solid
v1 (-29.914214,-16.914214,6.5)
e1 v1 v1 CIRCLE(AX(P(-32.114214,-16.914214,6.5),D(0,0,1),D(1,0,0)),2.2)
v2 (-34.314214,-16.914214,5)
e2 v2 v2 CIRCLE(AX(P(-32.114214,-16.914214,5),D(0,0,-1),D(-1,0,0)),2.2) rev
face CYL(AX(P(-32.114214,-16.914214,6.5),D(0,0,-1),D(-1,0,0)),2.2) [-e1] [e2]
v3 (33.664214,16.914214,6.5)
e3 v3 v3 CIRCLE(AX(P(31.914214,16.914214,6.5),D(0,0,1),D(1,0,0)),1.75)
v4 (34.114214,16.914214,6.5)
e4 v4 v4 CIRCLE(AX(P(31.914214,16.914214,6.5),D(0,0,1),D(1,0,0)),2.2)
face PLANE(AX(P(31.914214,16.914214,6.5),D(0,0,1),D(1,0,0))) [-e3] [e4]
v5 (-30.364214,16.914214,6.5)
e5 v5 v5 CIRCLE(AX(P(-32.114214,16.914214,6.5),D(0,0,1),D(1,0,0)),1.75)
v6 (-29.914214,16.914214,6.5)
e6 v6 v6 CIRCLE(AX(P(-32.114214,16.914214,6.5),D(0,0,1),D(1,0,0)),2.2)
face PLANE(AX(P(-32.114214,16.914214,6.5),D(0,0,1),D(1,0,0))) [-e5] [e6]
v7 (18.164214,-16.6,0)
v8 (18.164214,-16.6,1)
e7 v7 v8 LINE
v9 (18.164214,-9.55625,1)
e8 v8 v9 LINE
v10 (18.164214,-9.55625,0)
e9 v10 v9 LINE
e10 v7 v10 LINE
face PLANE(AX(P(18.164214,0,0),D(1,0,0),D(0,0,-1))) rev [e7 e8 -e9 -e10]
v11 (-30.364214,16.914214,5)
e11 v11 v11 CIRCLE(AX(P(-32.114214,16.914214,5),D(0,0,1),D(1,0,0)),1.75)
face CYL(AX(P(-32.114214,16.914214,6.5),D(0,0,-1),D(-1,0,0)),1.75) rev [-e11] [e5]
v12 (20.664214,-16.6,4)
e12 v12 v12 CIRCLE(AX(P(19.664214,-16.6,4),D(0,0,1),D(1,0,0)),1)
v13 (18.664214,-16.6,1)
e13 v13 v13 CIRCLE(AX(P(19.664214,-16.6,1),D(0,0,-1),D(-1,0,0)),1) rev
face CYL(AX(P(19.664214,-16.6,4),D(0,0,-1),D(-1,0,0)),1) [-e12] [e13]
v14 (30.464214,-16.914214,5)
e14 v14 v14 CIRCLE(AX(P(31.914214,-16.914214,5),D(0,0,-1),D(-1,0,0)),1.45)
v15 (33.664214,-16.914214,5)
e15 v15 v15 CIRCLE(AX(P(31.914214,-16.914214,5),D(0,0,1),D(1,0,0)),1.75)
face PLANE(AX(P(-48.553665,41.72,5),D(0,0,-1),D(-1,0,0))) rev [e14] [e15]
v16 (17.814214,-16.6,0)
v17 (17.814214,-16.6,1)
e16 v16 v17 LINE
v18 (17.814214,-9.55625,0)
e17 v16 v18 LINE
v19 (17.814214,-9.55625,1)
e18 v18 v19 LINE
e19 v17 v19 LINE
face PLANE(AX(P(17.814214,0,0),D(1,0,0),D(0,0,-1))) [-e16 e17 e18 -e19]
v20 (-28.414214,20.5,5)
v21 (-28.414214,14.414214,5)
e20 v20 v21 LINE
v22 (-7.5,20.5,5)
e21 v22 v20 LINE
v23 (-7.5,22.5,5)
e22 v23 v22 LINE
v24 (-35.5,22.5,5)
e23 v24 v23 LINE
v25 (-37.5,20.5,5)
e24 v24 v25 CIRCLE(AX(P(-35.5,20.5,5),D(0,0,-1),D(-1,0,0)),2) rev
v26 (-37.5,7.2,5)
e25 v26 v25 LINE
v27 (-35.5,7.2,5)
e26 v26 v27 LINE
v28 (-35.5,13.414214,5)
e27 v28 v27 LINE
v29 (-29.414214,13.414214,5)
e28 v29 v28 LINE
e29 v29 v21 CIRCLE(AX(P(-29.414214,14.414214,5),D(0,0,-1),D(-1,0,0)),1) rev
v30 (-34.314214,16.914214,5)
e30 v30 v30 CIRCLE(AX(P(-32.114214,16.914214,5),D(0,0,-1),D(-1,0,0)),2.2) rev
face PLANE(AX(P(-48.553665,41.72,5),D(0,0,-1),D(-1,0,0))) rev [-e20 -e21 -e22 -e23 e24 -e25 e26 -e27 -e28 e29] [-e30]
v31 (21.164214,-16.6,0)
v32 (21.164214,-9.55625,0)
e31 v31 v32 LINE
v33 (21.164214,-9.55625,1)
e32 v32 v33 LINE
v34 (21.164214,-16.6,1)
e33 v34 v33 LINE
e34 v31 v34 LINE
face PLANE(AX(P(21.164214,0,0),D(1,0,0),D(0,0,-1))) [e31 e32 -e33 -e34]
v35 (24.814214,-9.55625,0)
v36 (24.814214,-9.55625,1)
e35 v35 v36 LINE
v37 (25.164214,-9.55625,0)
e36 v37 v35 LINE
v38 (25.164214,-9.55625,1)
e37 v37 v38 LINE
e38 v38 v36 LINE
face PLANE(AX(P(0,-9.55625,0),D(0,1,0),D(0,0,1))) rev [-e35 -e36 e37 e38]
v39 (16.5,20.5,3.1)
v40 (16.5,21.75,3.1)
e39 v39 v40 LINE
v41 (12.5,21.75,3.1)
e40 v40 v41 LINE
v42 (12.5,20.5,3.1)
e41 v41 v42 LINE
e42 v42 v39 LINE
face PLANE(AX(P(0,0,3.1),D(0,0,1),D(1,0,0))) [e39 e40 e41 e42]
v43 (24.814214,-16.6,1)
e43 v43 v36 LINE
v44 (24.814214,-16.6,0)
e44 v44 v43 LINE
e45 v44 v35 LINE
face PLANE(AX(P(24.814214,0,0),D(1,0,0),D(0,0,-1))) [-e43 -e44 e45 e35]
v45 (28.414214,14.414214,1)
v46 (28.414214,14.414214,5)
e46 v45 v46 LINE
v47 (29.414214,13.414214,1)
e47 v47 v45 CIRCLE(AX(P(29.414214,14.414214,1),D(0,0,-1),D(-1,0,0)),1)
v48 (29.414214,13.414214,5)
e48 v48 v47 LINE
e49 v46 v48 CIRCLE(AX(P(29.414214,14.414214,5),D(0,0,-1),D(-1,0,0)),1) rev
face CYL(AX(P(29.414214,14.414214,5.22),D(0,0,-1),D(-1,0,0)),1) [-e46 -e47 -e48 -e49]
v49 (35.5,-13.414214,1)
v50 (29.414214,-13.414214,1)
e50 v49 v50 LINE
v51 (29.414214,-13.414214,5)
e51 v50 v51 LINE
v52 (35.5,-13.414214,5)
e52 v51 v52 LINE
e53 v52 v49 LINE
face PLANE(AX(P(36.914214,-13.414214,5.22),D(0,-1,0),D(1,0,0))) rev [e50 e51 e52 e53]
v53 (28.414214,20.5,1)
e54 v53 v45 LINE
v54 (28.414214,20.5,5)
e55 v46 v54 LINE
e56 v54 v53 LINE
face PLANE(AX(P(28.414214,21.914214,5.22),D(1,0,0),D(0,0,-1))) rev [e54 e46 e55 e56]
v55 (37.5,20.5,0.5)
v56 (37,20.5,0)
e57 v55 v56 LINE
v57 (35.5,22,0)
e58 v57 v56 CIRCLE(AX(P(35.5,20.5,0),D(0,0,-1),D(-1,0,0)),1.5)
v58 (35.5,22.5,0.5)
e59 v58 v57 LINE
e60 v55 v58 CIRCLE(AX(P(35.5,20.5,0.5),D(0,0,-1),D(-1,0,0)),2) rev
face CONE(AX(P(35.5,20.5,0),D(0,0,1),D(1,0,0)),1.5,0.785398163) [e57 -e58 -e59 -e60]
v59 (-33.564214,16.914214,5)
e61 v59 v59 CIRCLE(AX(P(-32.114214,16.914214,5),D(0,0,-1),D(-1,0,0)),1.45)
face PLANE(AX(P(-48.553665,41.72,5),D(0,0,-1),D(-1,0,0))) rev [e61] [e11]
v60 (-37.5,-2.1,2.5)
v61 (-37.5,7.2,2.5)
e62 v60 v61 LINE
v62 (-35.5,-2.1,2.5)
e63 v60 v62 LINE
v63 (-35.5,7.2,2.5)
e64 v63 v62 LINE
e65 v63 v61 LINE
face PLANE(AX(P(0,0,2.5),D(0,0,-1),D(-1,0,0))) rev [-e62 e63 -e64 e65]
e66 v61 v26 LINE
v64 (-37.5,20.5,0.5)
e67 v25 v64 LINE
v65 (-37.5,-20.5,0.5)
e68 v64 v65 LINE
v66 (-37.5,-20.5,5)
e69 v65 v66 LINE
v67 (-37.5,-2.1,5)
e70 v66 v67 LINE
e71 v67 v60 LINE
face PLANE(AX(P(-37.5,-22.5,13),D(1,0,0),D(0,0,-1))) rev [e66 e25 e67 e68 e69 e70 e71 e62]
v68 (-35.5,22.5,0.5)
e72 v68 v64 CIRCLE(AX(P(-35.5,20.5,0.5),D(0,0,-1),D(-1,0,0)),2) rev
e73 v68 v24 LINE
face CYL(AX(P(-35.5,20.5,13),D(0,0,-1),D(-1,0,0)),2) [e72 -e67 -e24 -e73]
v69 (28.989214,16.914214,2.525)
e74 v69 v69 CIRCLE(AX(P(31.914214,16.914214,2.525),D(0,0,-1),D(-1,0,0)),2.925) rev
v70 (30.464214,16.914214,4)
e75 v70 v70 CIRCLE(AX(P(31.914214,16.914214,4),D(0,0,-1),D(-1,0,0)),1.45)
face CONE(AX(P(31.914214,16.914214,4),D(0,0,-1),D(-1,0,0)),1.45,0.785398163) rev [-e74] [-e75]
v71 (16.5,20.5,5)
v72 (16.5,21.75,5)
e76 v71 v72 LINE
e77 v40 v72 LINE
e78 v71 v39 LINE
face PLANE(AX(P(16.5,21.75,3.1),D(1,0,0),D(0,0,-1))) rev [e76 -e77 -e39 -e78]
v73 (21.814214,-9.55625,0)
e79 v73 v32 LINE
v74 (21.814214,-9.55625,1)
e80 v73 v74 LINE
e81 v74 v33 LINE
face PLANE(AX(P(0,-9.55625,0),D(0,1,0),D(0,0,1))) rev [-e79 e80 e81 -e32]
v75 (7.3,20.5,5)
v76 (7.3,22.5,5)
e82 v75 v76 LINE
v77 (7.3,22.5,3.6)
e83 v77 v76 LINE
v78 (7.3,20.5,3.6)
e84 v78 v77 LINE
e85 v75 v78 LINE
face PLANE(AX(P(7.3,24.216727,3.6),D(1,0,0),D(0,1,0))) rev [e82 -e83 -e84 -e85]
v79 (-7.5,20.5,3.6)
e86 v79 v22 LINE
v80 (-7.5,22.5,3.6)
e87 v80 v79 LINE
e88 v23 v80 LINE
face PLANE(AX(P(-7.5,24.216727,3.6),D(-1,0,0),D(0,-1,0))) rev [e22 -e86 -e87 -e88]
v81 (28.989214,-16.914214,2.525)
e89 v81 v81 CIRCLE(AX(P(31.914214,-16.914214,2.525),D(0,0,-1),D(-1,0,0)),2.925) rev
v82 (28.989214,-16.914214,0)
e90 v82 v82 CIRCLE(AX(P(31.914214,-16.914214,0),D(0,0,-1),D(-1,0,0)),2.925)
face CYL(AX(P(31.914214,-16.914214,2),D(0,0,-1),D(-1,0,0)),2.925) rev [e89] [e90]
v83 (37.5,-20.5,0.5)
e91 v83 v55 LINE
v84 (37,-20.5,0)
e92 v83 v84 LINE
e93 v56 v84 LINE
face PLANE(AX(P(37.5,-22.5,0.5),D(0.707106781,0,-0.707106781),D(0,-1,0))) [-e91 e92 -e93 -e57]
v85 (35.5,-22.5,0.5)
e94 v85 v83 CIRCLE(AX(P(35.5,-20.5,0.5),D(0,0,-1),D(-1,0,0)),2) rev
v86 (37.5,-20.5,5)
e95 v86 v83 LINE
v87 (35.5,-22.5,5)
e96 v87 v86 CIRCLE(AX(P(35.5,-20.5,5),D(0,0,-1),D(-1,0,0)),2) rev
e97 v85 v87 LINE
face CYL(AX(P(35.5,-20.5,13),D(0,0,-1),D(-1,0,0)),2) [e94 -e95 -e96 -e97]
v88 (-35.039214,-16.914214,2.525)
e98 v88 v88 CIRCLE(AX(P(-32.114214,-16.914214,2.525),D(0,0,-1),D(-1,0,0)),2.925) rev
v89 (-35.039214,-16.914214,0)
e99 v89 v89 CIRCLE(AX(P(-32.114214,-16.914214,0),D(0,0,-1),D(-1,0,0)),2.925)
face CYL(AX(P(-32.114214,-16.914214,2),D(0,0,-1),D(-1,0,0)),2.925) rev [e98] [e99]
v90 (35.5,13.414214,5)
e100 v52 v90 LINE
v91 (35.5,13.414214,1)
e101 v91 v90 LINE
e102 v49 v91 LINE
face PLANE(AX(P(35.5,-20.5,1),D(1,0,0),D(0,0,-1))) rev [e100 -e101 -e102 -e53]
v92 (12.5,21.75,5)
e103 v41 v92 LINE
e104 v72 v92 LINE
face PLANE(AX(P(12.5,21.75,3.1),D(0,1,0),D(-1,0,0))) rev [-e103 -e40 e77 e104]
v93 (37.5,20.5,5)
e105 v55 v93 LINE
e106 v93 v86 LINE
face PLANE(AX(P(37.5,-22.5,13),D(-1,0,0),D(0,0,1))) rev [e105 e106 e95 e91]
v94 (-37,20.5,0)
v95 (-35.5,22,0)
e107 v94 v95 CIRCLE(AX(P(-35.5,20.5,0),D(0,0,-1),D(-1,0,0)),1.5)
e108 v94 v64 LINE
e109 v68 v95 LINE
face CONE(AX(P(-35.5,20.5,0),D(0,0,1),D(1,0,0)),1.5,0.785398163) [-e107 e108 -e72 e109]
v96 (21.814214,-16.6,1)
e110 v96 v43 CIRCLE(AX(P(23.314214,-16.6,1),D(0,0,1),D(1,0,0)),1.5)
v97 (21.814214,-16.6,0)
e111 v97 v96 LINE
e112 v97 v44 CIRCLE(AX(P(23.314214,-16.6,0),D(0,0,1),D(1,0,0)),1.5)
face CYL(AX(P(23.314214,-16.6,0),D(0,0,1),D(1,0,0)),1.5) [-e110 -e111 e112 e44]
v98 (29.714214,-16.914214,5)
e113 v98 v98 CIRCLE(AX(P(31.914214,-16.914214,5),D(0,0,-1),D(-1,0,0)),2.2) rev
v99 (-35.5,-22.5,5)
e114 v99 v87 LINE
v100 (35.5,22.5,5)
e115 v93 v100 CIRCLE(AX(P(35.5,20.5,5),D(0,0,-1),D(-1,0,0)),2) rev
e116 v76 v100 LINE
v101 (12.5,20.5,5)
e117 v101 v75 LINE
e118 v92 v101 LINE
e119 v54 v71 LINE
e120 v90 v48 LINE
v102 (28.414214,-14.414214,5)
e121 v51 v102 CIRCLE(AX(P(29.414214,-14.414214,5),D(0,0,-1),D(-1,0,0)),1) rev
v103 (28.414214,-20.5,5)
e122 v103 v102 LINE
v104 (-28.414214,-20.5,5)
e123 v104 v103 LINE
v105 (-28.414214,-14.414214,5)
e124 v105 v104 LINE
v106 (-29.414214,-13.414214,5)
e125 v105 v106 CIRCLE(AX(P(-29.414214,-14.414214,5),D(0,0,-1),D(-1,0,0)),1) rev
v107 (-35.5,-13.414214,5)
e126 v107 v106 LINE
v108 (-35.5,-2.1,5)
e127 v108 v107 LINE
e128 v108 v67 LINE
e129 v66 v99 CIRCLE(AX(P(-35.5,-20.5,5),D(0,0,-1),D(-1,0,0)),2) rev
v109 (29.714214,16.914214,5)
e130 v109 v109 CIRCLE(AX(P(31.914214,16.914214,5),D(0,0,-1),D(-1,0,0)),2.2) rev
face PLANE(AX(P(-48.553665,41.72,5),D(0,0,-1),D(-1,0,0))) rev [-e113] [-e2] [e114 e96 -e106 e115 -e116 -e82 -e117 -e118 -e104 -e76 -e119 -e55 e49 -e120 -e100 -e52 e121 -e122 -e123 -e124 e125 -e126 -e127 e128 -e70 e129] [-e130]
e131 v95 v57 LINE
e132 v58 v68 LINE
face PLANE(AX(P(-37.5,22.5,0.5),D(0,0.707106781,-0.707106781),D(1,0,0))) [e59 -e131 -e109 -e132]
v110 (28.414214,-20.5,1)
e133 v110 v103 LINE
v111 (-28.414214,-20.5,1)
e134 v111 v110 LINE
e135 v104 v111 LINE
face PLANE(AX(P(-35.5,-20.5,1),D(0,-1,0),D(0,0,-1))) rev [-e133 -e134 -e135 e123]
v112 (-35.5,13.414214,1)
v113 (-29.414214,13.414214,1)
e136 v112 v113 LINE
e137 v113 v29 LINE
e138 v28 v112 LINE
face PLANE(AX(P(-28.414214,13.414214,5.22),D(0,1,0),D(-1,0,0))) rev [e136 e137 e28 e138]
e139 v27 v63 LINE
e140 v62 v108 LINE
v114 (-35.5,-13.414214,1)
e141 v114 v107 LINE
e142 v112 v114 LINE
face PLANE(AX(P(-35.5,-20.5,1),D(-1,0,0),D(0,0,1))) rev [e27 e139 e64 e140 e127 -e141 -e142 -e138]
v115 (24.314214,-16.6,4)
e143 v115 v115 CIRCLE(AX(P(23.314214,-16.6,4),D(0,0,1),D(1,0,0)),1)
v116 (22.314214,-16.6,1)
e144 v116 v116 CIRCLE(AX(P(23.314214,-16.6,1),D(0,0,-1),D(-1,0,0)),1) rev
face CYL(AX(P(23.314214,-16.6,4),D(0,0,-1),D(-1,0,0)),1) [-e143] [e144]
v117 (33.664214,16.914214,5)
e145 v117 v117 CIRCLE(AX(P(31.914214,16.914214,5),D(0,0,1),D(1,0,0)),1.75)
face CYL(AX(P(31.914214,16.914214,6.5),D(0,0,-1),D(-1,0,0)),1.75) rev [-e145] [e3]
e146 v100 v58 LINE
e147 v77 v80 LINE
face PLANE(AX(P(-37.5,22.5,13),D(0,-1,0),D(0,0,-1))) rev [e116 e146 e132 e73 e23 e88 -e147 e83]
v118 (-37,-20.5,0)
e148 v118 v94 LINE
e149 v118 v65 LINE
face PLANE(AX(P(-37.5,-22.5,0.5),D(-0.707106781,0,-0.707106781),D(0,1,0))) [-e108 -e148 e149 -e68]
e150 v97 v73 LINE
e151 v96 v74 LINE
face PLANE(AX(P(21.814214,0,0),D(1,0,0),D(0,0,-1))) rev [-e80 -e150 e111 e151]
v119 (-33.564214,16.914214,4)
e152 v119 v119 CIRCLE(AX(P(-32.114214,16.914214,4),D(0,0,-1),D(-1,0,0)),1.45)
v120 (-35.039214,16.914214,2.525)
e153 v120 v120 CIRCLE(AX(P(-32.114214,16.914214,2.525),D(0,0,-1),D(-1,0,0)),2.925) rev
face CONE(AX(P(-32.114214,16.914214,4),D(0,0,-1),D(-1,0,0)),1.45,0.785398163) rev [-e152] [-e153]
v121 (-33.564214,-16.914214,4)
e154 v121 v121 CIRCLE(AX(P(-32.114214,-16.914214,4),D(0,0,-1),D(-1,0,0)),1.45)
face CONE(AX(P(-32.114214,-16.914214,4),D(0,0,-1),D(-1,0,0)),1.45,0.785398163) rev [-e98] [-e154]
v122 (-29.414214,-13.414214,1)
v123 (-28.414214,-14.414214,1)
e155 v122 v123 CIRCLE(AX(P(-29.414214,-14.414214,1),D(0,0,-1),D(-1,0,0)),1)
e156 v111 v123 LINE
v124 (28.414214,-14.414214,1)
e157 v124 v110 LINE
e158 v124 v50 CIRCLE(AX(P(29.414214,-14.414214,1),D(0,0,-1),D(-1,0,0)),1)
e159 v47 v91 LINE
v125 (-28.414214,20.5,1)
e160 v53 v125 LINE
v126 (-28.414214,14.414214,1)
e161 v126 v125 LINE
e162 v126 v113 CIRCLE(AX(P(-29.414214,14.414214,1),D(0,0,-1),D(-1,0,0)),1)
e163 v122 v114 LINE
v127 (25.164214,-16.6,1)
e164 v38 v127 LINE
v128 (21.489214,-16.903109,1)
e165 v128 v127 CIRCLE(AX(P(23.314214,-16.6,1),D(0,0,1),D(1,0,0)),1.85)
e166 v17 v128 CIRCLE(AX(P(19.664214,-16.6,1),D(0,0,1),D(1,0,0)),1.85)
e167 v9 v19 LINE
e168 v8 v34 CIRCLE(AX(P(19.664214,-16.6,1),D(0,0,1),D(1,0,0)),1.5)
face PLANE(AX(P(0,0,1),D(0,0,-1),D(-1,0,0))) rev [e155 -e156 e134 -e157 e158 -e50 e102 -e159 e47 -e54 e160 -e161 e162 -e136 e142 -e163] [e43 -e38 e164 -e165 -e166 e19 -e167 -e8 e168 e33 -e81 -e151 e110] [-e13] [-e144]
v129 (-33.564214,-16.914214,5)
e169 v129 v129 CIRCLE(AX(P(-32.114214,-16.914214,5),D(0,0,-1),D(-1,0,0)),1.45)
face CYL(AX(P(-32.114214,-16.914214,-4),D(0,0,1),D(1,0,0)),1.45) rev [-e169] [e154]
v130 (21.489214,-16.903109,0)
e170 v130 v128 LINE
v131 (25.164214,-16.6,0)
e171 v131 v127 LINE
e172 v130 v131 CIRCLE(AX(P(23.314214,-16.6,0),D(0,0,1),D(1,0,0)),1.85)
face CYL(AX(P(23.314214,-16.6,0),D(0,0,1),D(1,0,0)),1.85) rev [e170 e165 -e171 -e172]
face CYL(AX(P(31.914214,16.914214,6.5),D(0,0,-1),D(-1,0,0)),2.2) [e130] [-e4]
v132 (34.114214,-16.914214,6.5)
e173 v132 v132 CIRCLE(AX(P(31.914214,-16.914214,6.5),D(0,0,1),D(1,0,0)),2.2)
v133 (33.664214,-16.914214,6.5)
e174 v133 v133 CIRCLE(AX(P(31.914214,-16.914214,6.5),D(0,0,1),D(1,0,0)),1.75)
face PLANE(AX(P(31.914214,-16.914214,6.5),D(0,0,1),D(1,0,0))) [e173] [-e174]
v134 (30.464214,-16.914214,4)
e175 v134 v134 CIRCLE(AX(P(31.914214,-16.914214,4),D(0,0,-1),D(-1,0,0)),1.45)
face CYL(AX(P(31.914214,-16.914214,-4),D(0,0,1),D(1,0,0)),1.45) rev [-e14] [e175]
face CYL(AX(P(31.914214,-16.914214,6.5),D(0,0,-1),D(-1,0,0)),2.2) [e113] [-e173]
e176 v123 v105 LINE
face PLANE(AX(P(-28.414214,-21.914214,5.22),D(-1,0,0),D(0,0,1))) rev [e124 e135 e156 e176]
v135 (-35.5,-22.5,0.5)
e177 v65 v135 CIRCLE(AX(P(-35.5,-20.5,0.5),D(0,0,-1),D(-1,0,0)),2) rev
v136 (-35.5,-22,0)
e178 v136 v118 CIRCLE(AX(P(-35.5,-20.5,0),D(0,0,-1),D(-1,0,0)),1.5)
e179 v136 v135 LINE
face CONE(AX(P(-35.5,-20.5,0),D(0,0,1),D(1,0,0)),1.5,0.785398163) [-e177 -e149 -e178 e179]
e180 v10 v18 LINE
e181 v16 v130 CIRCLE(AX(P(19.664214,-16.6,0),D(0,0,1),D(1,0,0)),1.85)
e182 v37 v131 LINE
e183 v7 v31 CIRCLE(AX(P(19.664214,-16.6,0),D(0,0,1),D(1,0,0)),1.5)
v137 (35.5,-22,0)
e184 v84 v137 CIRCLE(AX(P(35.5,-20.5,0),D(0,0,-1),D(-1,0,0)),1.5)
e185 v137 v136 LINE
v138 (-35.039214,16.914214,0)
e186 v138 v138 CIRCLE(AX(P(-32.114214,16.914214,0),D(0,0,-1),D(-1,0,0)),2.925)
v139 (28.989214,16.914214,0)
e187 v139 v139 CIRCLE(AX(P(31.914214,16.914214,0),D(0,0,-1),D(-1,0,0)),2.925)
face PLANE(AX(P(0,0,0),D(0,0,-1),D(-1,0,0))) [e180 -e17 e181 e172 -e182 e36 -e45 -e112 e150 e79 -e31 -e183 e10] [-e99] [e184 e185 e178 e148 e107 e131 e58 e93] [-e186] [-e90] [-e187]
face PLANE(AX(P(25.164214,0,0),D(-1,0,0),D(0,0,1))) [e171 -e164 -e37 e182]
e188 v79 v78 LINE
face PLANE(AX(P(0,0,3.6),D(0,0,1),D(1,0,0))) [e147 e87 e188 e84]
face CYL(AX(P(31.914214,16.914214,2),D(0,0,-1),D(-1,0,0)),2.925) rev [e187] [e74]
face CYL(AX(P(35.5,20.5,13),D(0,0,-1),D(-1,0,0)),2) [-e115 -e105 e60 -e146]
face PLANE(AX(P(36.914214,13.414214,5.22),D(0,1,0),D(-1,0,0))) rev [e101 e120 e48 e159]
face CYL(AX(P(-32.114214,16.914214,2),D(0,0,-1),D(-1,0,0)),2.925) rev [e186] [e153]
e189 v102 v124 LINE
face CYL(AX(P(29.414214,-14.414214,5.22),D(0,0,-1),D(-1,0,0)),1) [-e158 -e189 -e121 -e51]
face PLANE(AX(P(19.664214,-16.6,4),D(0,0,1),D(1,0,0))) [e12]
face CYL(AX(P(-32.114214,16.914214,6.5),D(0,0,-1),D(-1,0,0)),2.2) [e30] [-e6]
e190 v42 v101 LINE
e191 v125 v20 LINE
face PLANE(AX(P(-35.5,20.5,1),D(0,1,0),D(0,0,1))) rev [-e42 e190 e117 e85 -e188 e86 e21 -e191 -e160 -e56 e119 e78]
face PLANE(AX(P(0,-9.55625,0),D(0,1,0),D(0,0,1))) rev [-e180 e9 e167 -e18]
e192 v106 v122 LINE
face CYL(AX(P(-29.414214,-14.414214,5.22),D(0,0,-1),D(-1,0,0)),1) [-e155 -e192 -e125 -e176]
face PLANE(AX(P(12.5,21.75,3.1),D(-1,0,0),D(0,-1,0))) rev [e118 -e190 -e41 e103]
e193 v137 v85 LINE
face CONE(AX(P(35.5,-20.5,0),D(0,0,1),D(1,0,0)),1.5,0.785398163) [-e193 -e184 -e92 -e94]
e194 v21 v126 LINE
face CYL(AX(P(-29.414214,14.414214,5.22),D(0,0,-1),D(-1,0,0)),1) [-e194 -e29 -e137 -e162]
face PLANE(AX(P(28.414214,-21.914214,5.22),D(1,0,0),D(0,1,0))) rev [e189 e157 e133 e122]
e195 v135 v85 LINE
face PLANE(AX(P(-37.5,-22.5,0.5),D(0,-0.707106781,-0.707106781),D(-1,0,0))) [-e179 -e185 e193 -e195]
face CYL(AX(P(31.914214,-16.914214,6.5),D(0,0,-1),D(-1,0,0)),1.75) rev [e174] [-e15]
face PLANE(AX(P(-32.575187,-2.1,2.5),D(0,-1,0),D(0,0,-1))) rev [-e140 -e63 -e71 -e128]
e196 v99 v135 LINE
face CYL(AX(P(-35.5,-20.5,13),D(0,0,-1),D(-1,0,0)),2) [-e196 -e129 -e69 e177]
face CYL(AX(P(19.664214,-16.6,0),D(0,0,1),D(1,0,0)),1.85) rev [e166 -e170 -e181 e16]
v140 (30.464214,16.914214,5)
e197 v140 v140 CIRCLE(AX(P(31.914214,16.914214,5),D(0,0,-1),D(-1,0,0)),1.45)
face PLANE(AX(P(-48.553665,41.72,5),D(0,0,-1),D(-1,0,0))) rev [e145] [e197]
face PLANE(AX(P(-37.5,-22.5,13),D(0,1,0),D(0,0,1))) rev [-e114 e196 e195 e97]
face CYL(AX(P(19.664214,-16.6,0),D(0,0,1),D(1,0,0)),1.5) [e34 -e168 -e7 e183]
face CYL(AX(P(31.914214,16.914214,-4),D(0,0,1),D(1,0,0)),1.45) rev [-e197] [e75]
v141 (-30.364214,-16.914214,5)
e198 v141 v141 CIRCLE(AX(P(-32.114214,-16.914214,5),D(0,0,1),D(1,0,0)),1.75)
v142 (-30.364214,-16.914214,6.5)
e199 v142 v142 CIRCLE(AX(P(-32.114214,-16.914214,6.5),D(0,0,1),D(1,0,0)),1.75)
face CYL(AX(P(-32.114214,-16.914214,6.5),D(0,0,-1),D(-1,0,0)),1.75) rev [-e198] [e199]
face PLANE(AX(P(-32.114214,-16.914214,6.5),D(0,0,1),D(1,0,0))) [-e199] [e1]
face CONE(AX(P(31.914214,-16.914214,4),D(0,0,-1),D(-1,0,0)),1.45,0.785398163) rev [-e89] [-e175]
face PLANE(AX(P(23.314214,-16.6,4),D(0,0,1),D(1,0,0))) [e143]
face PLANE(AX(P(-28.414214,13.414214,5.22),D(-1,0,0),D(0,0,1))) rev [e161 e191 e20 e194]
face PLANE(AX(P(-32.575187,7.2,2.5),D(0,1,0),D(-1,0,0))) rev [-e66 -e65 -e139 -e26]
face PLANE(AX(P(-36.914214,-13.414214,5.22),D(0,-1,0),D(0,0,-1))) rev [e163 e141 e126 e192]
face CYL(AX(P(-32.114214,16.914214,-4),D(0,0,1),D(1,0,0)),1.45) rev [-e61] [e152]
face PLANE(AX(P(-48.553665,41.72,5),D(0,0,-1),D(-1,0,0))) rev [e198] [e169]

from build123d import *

# Parameters (mm, degrees)
SKICA1_W                  = 75
SKICA1_H                  = 45
P_IDAT_VYSUNUT_M1_DEPTH   = 13
SKICA2_W                  = 71
SKICA2_H                  = 41
ODEBRAT_VYSUNUT_M1_DEPTH  = 12
ZAOBLIT1_R                = 2
ZKOSEN_2_SIZE             = 0.5
SKICA4_W                  = 8.5
SKICA4_H                  = 8.5
P_IDAT_VYSUNUT_M2_DEPTH   = 4.22
ZAOBLIT2_R                = 1
SKICA6_W                  = 92.209043038
SKICA6_H                  = 16.914138174
ODEBRAT_VYSUNUT_M3_DEPTH  = 64.22
SKICA5_W                  = 10.08575576
SKICA5_H                  = 9.3
ODEBRAT_VYSUNUT_M4_DEPTH  = 10.5
SKICA7_W                  = 4
SKICA7_H                  = 7.545536299
ODEBRAT_VYSUNUT_M5_DEPTH  = 1.9
SKICA8_W                  = 14.8
SKICA8_H                  = 7.292326558
ODEBRAT_VYSUNUT_M6_DEPTH  = 1.4
SKICA9_R                  = 1.45
ODEBRAT_VYSUNUT_M7_DEPTH  = 5
SKICA10_R                 = 2.2
SKICA10_R_2               = 1.75
P_IDAT_VYSUNUT_M3_DEPTH   = 1.5
ODEBRAT_START             = -2
SKICA11_R                 = 2.925
SKICA11_R_2               = 1.45
ODEBRAT_VYSUNUT_M8_DEPTH  = 2
SKICA12_R                 = 1
P_IDAT_VYSUNUT_M4_DEPTH   = 3
ODEBRAT_VYSUNUT_M14_DEPTH = 1
ZKOSEN_3_SIZE             = 2
ZKOSEN_4_SIZE             = 2


with BuildPart() as part:
    # Skica1 → Přidat vysunutím1 (new body)
    with BuildSketch(Plane.XY):
        Rectangle(SKICA1_W, SKICA1_H)
    extrude(amount=P_IDAT_VYSUNUT_M1_DEPTH)

    # Skica2 → Odebrat vysunutím1 (cut)
    with BuildSketch(Plane.XY.offset(13)):
        Rectangle(SKICA2_W, SKICA2_H)
    extrude(amount=-ODEBRAT_VYSUNUT_M1_DEPTH, mode=Mode.SUBTRACT)

    # Zaoblit1
    zaoblit1_edges = [part.edges().sort_by_distance(p)[0] for p in [
        (35.5, 20.5, 7),
        (35.5, -20.5, 7),
        (-35.5, -20.5, 7),
        (-35.5, 20.5, 7),
        (37.5, -22.5, 6.5),
        (-37.5, -22.5, 6.5),
        (-37.5, 22.5, 6.5),
        (37.5, 22.5, 6.5),
    ]]
    fillet(zaoblit1_edges, radius=ZAOBLIT1_R)

    # Zkosení2
    zkosen_2_edges = [part.edges().sort_by_distance(p)[0] for p in [
        (0, 22.5, 0),
        (37.5, 0, 0),
        (0, -22.5, 0),
        (-37.5, 0, 0),
        (-36.914213562, 21.914213562, 0),
        (-36.914213562, -21.914213562, 0),
        (36.914213562, -21.914213562, 0),
        (36.914213562, 21.914213562, 0),
    ]]
    chamfer(zkosen_2_edges, length=ZKOSEN_2_SIZE)

    # Skica4 → Přidat vysunutím2 (add)
    with BuildSketch(Plane.XY.offset(1)):
        with Locations((-32.664213562, 17.664213562)):
            Rectangle(SKICA4_W, SKICA4_H)
        with Locations((-32.664213562, -17.664213562)):
            Rectangle(SKICA4_W, SKICA4_H)
        with Locations((32.664213562, -17.664213562)):
            Rectangle(SKICA4_W, SKICA4_H)
        with Locations((32.664213562, 17.664213562)):
            Rectangle(SKICA4_W, SKICA4_H)
    extrude(amount=P_IDAT_VYSUNUT_M2_DEPTH)

    # Zaoblit2
    zaoblit2_edges = [part.edges().sort_by_distance(p)[0] for p in [
        (-28.414213562, 13.414213562, 3.11),
        (-28.414213562, -13.414213562, 3.11),
        (28.414213562, -13.414213562, 3.11),
        (28.414213562, 13.414213562, 3.11),
    ]]
    fillet(zaoblit2_edges, radius=ZAOBLIT2_R)

    # Skica6 → Odebrat vysunutím3 (cut)
    with BuildSketch(Plane.XZ.offset(22.5)):
        with Locations((-2.449143373, 13.457069087)):
            Rectangle(SKICA6_W, SKICA6_H)
    extrude(amount=-ODEBRAT_VYSUNUT_M3_DEPTH, mode=Mode.SUBTRACT)

    # Skica5 → Odebrat vysunutím4 (cut)
    with BuildSketch(Plane.XY.offset(13)):
        with Locations((-37.618064514, 2.55)):
            Rectangle(SKICA5_W, SKICA5_H)
    extrude(amount=-ODEBRAT_VYSUNUT_M4_DEPTH, mode=Mode.SUBTRACT)

    # Skica7 → Odebrat vysunutím5 (cut)
    with BuildSketch(Plane.XY.offset(5)):
        with Locations((14.5, 17.977231851)):
            Rectangle(SKICA7_W, SKICA7_H)
    extrude(amount=-ODEBRAT_VYSUNUT_M5_DEPTH, mode=Mode.SUBTRACT)

    # Skica8 → Odebrat vysunutím6 (cut)
    with BuildSketch(Plane.XY.offset(5)):
        with Locations((-0.1, 20.570563513)):
            Rectangle(SKICA8_W, SKICA8_H)
    extrude(amount=-ODEBRAT_VYSUNUT_M6_DEPTH, mode=Mode.SUBTRACT)

    # Skica9 → Odebrat vysunutím7 (cut, symmetric)
    with BuildSketch(Plane.XY.offset(1)):
        with Locations(Location((-32.114213562, 16.914213562, 0), (0, 0, 180))):
            Circle(SKICA9_R)
        with Locations(Location((-32.114213562, -16.914213562, 0), (0, 0, 180))):
            Circle(SKICA9_R)
        with Locations(Location((31.914213562, -16.914213562, 0), (0, 0, 180))):
            Circle(SKICA9_R)
        with Locations(Location((31.914213562, 16.914213562, 0), (0, 0, 180))):
            Circle(SKICA9_R)
    extrude(amount=ODEBRAT_VYSUNUT_M7_DEPTH, both=True, mode=Mode.SUBTRACT)

    # Skica10 → Přidat vysunutím3 (add)
    # profile 1 of 4: a face of its own
    with BuildSketch(Plane.XY.offset(5)):
        with Locations(Location((31.914213562, 16.914213562, 0), (0, 0, 180))):
            Circle(SKICA10_R)
        with Locations((31.914213562, 16.914213562)):
            Circle(SKICA10_R_2, mode=Mode.SUBTRACT)
    # profile 2 of 4: a face of its own
    with BuildSketch(Plane.XY.offset(5)):
        with Locations(Location((31.914213562, -16.914213562, 0), (0, 0, 180))):
            Circle(SKICA10_R)
        with Locations((31.914213562, -16.914213562)):
            Circle(SKICA10_R_2, mode=Mode.SUBTRACT)
    # profile 3 of 4: a face of its own
    with BuildSketch(Plane.XY.offset(5)):
        with Locations(Location((-32.114213562, -16.914213562, 0), (0, 0, 180))):
            Circle(SKICA10_R)
        with Locations((-32.114213562, -16.914213562)):
            Circle(SKICA10_R_2, mode=Mode.SUBTRACT)
    # profile 4 of 4: a face of its own
    with BuildSketch(Plane.XY.offset(5)):
        with Locations(Location((-32.114213562, 16.914213562, 0), (0, 0, 180))):
            Circle(SKICA10_R)
        with Locations((-32.114213562, 16.914213562)):
            Circle(SKICA10_R_2, mode=Mode.SUBTRACT)
    extrude(amount=P_IDAT_VYSUNUT_M3_DEPTH)

    # Skica11 → Odebrat vysunutím8 (cut)
    # profile 1 of 4: a face of its own
    with BuildSketch(Plane(origin=(0, 0, 0), x_dir=(-1, 0, 0), z_dir=(0, 0, -1)).offset(ODEBRAT_START)):
        with Locations((32.114213562, -16.914213562)):
            Circle(SKICA11_R)
        with Locations((32.114213562, -16.914213562)):
            Circle(SKICA11_R_2, mode=Mode.SUBTRACT)
    # profile 2 of 4: a face of its own
    with BuildSketch(Plane(origin=(0, 0, 0), x_dir=(-1, 0, 0), z_dir=(0, 0, -1)).offset(ODEBRAT_START)):
        with Locations((-31.914213562, -16.914213562)):
            Circle(SKICA11_R)
        with Locations((-31.914213562, -16.914213562)):
            Circle(SKICA11_R_2, mode=Mode.SUBTRACT)
    # profile 3 of 4: a face of its own
    with BuildSketch(Plane(origin=(0, 0, 0), x_dir=(-1, 0, 0), z_dir=(0, 0, -1)).offset(ODEBRAT_START)):
        with Locations((-31.914213562, 16.914213562)):
            Circle(SKICA11_R)
        with Locations((-31.914213562, 16.914213562)):
            Circle(SKICA11_R_2, mode=Mode.SUBTRACT)
    # profile 4 of 4: a face of its own
    with BuildSketch(Plane(origin=(0, 0, 0), x_dir=(-1, 0, 0), z_dir=(0, 0, -1)).offset(ODEBRAT_START)):
        with Locations((32.114213562, 16.914213562)):
            Circle(SKICA11_R)
        with Locations((32.114213562, 16.914213562)):
            Circle(SKICA11_R_2, mode=Mode.SUBTRACT)
    extrude(amount=ODEBRAT_VYSUNUT_M8_DEPTH, mode=Mode.SUBTRACT)

    # Skica12 → Přidat vysunutím4 (add)
    with BuildSketch(Plane.XY.offset(1)):
        with Locations(Location((23.314213562, -16.6, 0), (0, 0, 180))):
            Circle(SKICA12_R)
        with Locations(Location((19.664213562, -16.6, 0), (0, 0, 180))):
            Circle(SKICA12_R)
    extrude(amount=P_IDAT_VYSUNUT_M4_DEPTH)

    # Skica13 → Odebrat vysunutím14 (cut)
    with BuildSketch(Plane.XY.offset(1)):
        with BuildLine():
            ThreePointArc((24.814213562, -16.6), (23.314213562, -18.1), (21.814213562, -16.6))
            Line((21.814213562, -16.6), (21.814213562, -9.556250206))
            Line((21.814213562, -9.556250206), (21.514213562, -9.556250206))
            Line((21.514213562, -9.556250206), (21.464213562, -9.556250206))
            Line((21.464213562, -9.556250206), (21.164213562, -9.556250206))
            Line((21.164213562, -9.556250206), (21.164213562, -16.6))
            ThreePointArc((21.164213562, -16.6), (19.664213562, -18.1), (18.164213562, -16.6))
            Line((18.164213562, -16.6), (18.164213562, -9.556250206))
            Line((18.164213562, -9.556250206), (17.814213562, -9.556250206))
            Line((17.814213562, -9.556250206), (17.814213562, -16.6))
            ThreePointArc((17.814213562, -16.6), (19.512144499, -18.443739407), (21.489213562, -16.903108891))
            ThreePointArc((21.489213562, -16.903108891), (23.466282626, -18.443739407), (25.164213562, -16.6))
            Line((25.164213562, -16.6), (25.164213562, -9.556250206))
            Line((25.164213562, -9.556250206), (24.814213562, -9.556250206))
            Line((24.814213562, -9.556250206), (24.814213562, -16.6))
        make_face()
    extrude(amount=-ODEBRAT_VYSUNUT_M14_DEPTH, mode=Mode.SUBTRACT)

    # Zkosení3
    # the kernel refuses this chamfer: 2 mm, written as the material it takes off along each edge
    with BuildSketch(Plane(origin=(31.914213562, 16.914213562, 2), x_dir=(-1, 0, 0), z_dir=(0, -1, 0))) as zkosen_3_piece_1_section:
        Polygon((1.45 + ZKOSEN_3_SIZE, 0), (1.45, -ZKOSEN_3_SIZE), (1.45, 0), align=None)
    zkosen_3_piece_1 = revolve(axis=Axis((31.914213562, 16.914213562, 2), (0, 0, -1)), mode=Mode.PRIVATE)
    zkosen_3_piece_1 = zkosen_3_piece_1 & Plane(origin=(31.914213562, 16.914213562, 3.26993651), x_dir=(-1, 0, 0), z_dir=(0, 0, 1)) * Cylinder(2.925, 14, mode=Mode.PRIVATE)
    add(zkosen_3_piece_1, mode=Mode.SUBTRACT)
    with BuildSketch(Plane(origin=(-32.114213562, -16.914213562, 2), x_dir=(-1, 0, 0), z_dir=(0, -1, 0))) as zkosen_3_piece_2_section:
        Polygon((1.45 + ZKOSEN_3_SIZE, 0), (1.45, -ZKOSEN_3_SIZE), (1.45, 0), align=None)
    zkosen_3_piece_2 = revolve(axis=Axis((-32.114213562, -16.914213562, 2), (0, 0, -1)), mode=Mode.PRIVATE)
    zkosen_3_piece_2 = zkosen_3_piece_2 & Plane(origin=(-32.114213562, -16.914213562, 3.26993651), x_dir=(-1, 0, 0), z_dir=(0, 0, 1)) * Cylinder(2.925, 14, mode=Mode.PRIVATE)
    add(zkosen_3_piece_2, mode=Mode.SUBTRACT)

    # Zkosení4
    # the kernel refuses this chamfer: 2 mm, written as the material it takes off along each edge
    with BuildSketch(Plane(origin=(31.914213562, -16.914213562, 2), x_dir=(-1, 0, 0), z_dir=(0, -1, 0))) as zkosen_4_piece_1_section:
        Polygon((1.45 + ZKOSEN_4_SIZE, 0), (1.45, -ZKOSEN_4_SIZE), (1.45, 0), align=None)
    zkosen_4_piece_1 = revolve(axis=Axis((31.914213562, -16.914213562, 2), (0, 0, -1)), mode=Mode.PRIVATE)
    zkosen_4_piece_1 = zkosen_4_piece_1 & Plane(origin=(31.914213562, -16.914213562, 3.26993651), x_dir=(-1, 0, 0), z_dir=(0, 0, 1)) * Cylinder(2.925, 14, mode=Mode.PRIVATE)
    add(zkosen_4_piece_1, mode=Mode.SUBTRACT)
    with BuildSketch(Plane(origin=(-32.114213562, 16.914213562, 2), x_dir=(-1, 0, 0), z_dir=(0, -1, 0))) as zkosen_4_piece_2_section:
        Polygon((1.45 + ZKOSEN_4_SIZE, 0), (1.45, -ZKOSEN_4_SIZE), (1.45, 0), align=None)
    zkosen_4_piece_2 = revolve(axis=Axis((-32.114213562, 16.914213562, 2), (0, 0, -1)), mode=Mode.PRIVATE)
    zkosen_4_piece_2 = zkosen_4_piece_2 & Plane(origin=(-32.114213562, 16.914213562, 3.26993651), x_dir=(-1, 0, 0), z_dir=(0, 0, 1)) * Cylinder(2.925, 14, mode=Mode.PRIVATE)
    add(zkosen_4_piece_2, mode=Mode.SUBTRACT)


solid = part.part
